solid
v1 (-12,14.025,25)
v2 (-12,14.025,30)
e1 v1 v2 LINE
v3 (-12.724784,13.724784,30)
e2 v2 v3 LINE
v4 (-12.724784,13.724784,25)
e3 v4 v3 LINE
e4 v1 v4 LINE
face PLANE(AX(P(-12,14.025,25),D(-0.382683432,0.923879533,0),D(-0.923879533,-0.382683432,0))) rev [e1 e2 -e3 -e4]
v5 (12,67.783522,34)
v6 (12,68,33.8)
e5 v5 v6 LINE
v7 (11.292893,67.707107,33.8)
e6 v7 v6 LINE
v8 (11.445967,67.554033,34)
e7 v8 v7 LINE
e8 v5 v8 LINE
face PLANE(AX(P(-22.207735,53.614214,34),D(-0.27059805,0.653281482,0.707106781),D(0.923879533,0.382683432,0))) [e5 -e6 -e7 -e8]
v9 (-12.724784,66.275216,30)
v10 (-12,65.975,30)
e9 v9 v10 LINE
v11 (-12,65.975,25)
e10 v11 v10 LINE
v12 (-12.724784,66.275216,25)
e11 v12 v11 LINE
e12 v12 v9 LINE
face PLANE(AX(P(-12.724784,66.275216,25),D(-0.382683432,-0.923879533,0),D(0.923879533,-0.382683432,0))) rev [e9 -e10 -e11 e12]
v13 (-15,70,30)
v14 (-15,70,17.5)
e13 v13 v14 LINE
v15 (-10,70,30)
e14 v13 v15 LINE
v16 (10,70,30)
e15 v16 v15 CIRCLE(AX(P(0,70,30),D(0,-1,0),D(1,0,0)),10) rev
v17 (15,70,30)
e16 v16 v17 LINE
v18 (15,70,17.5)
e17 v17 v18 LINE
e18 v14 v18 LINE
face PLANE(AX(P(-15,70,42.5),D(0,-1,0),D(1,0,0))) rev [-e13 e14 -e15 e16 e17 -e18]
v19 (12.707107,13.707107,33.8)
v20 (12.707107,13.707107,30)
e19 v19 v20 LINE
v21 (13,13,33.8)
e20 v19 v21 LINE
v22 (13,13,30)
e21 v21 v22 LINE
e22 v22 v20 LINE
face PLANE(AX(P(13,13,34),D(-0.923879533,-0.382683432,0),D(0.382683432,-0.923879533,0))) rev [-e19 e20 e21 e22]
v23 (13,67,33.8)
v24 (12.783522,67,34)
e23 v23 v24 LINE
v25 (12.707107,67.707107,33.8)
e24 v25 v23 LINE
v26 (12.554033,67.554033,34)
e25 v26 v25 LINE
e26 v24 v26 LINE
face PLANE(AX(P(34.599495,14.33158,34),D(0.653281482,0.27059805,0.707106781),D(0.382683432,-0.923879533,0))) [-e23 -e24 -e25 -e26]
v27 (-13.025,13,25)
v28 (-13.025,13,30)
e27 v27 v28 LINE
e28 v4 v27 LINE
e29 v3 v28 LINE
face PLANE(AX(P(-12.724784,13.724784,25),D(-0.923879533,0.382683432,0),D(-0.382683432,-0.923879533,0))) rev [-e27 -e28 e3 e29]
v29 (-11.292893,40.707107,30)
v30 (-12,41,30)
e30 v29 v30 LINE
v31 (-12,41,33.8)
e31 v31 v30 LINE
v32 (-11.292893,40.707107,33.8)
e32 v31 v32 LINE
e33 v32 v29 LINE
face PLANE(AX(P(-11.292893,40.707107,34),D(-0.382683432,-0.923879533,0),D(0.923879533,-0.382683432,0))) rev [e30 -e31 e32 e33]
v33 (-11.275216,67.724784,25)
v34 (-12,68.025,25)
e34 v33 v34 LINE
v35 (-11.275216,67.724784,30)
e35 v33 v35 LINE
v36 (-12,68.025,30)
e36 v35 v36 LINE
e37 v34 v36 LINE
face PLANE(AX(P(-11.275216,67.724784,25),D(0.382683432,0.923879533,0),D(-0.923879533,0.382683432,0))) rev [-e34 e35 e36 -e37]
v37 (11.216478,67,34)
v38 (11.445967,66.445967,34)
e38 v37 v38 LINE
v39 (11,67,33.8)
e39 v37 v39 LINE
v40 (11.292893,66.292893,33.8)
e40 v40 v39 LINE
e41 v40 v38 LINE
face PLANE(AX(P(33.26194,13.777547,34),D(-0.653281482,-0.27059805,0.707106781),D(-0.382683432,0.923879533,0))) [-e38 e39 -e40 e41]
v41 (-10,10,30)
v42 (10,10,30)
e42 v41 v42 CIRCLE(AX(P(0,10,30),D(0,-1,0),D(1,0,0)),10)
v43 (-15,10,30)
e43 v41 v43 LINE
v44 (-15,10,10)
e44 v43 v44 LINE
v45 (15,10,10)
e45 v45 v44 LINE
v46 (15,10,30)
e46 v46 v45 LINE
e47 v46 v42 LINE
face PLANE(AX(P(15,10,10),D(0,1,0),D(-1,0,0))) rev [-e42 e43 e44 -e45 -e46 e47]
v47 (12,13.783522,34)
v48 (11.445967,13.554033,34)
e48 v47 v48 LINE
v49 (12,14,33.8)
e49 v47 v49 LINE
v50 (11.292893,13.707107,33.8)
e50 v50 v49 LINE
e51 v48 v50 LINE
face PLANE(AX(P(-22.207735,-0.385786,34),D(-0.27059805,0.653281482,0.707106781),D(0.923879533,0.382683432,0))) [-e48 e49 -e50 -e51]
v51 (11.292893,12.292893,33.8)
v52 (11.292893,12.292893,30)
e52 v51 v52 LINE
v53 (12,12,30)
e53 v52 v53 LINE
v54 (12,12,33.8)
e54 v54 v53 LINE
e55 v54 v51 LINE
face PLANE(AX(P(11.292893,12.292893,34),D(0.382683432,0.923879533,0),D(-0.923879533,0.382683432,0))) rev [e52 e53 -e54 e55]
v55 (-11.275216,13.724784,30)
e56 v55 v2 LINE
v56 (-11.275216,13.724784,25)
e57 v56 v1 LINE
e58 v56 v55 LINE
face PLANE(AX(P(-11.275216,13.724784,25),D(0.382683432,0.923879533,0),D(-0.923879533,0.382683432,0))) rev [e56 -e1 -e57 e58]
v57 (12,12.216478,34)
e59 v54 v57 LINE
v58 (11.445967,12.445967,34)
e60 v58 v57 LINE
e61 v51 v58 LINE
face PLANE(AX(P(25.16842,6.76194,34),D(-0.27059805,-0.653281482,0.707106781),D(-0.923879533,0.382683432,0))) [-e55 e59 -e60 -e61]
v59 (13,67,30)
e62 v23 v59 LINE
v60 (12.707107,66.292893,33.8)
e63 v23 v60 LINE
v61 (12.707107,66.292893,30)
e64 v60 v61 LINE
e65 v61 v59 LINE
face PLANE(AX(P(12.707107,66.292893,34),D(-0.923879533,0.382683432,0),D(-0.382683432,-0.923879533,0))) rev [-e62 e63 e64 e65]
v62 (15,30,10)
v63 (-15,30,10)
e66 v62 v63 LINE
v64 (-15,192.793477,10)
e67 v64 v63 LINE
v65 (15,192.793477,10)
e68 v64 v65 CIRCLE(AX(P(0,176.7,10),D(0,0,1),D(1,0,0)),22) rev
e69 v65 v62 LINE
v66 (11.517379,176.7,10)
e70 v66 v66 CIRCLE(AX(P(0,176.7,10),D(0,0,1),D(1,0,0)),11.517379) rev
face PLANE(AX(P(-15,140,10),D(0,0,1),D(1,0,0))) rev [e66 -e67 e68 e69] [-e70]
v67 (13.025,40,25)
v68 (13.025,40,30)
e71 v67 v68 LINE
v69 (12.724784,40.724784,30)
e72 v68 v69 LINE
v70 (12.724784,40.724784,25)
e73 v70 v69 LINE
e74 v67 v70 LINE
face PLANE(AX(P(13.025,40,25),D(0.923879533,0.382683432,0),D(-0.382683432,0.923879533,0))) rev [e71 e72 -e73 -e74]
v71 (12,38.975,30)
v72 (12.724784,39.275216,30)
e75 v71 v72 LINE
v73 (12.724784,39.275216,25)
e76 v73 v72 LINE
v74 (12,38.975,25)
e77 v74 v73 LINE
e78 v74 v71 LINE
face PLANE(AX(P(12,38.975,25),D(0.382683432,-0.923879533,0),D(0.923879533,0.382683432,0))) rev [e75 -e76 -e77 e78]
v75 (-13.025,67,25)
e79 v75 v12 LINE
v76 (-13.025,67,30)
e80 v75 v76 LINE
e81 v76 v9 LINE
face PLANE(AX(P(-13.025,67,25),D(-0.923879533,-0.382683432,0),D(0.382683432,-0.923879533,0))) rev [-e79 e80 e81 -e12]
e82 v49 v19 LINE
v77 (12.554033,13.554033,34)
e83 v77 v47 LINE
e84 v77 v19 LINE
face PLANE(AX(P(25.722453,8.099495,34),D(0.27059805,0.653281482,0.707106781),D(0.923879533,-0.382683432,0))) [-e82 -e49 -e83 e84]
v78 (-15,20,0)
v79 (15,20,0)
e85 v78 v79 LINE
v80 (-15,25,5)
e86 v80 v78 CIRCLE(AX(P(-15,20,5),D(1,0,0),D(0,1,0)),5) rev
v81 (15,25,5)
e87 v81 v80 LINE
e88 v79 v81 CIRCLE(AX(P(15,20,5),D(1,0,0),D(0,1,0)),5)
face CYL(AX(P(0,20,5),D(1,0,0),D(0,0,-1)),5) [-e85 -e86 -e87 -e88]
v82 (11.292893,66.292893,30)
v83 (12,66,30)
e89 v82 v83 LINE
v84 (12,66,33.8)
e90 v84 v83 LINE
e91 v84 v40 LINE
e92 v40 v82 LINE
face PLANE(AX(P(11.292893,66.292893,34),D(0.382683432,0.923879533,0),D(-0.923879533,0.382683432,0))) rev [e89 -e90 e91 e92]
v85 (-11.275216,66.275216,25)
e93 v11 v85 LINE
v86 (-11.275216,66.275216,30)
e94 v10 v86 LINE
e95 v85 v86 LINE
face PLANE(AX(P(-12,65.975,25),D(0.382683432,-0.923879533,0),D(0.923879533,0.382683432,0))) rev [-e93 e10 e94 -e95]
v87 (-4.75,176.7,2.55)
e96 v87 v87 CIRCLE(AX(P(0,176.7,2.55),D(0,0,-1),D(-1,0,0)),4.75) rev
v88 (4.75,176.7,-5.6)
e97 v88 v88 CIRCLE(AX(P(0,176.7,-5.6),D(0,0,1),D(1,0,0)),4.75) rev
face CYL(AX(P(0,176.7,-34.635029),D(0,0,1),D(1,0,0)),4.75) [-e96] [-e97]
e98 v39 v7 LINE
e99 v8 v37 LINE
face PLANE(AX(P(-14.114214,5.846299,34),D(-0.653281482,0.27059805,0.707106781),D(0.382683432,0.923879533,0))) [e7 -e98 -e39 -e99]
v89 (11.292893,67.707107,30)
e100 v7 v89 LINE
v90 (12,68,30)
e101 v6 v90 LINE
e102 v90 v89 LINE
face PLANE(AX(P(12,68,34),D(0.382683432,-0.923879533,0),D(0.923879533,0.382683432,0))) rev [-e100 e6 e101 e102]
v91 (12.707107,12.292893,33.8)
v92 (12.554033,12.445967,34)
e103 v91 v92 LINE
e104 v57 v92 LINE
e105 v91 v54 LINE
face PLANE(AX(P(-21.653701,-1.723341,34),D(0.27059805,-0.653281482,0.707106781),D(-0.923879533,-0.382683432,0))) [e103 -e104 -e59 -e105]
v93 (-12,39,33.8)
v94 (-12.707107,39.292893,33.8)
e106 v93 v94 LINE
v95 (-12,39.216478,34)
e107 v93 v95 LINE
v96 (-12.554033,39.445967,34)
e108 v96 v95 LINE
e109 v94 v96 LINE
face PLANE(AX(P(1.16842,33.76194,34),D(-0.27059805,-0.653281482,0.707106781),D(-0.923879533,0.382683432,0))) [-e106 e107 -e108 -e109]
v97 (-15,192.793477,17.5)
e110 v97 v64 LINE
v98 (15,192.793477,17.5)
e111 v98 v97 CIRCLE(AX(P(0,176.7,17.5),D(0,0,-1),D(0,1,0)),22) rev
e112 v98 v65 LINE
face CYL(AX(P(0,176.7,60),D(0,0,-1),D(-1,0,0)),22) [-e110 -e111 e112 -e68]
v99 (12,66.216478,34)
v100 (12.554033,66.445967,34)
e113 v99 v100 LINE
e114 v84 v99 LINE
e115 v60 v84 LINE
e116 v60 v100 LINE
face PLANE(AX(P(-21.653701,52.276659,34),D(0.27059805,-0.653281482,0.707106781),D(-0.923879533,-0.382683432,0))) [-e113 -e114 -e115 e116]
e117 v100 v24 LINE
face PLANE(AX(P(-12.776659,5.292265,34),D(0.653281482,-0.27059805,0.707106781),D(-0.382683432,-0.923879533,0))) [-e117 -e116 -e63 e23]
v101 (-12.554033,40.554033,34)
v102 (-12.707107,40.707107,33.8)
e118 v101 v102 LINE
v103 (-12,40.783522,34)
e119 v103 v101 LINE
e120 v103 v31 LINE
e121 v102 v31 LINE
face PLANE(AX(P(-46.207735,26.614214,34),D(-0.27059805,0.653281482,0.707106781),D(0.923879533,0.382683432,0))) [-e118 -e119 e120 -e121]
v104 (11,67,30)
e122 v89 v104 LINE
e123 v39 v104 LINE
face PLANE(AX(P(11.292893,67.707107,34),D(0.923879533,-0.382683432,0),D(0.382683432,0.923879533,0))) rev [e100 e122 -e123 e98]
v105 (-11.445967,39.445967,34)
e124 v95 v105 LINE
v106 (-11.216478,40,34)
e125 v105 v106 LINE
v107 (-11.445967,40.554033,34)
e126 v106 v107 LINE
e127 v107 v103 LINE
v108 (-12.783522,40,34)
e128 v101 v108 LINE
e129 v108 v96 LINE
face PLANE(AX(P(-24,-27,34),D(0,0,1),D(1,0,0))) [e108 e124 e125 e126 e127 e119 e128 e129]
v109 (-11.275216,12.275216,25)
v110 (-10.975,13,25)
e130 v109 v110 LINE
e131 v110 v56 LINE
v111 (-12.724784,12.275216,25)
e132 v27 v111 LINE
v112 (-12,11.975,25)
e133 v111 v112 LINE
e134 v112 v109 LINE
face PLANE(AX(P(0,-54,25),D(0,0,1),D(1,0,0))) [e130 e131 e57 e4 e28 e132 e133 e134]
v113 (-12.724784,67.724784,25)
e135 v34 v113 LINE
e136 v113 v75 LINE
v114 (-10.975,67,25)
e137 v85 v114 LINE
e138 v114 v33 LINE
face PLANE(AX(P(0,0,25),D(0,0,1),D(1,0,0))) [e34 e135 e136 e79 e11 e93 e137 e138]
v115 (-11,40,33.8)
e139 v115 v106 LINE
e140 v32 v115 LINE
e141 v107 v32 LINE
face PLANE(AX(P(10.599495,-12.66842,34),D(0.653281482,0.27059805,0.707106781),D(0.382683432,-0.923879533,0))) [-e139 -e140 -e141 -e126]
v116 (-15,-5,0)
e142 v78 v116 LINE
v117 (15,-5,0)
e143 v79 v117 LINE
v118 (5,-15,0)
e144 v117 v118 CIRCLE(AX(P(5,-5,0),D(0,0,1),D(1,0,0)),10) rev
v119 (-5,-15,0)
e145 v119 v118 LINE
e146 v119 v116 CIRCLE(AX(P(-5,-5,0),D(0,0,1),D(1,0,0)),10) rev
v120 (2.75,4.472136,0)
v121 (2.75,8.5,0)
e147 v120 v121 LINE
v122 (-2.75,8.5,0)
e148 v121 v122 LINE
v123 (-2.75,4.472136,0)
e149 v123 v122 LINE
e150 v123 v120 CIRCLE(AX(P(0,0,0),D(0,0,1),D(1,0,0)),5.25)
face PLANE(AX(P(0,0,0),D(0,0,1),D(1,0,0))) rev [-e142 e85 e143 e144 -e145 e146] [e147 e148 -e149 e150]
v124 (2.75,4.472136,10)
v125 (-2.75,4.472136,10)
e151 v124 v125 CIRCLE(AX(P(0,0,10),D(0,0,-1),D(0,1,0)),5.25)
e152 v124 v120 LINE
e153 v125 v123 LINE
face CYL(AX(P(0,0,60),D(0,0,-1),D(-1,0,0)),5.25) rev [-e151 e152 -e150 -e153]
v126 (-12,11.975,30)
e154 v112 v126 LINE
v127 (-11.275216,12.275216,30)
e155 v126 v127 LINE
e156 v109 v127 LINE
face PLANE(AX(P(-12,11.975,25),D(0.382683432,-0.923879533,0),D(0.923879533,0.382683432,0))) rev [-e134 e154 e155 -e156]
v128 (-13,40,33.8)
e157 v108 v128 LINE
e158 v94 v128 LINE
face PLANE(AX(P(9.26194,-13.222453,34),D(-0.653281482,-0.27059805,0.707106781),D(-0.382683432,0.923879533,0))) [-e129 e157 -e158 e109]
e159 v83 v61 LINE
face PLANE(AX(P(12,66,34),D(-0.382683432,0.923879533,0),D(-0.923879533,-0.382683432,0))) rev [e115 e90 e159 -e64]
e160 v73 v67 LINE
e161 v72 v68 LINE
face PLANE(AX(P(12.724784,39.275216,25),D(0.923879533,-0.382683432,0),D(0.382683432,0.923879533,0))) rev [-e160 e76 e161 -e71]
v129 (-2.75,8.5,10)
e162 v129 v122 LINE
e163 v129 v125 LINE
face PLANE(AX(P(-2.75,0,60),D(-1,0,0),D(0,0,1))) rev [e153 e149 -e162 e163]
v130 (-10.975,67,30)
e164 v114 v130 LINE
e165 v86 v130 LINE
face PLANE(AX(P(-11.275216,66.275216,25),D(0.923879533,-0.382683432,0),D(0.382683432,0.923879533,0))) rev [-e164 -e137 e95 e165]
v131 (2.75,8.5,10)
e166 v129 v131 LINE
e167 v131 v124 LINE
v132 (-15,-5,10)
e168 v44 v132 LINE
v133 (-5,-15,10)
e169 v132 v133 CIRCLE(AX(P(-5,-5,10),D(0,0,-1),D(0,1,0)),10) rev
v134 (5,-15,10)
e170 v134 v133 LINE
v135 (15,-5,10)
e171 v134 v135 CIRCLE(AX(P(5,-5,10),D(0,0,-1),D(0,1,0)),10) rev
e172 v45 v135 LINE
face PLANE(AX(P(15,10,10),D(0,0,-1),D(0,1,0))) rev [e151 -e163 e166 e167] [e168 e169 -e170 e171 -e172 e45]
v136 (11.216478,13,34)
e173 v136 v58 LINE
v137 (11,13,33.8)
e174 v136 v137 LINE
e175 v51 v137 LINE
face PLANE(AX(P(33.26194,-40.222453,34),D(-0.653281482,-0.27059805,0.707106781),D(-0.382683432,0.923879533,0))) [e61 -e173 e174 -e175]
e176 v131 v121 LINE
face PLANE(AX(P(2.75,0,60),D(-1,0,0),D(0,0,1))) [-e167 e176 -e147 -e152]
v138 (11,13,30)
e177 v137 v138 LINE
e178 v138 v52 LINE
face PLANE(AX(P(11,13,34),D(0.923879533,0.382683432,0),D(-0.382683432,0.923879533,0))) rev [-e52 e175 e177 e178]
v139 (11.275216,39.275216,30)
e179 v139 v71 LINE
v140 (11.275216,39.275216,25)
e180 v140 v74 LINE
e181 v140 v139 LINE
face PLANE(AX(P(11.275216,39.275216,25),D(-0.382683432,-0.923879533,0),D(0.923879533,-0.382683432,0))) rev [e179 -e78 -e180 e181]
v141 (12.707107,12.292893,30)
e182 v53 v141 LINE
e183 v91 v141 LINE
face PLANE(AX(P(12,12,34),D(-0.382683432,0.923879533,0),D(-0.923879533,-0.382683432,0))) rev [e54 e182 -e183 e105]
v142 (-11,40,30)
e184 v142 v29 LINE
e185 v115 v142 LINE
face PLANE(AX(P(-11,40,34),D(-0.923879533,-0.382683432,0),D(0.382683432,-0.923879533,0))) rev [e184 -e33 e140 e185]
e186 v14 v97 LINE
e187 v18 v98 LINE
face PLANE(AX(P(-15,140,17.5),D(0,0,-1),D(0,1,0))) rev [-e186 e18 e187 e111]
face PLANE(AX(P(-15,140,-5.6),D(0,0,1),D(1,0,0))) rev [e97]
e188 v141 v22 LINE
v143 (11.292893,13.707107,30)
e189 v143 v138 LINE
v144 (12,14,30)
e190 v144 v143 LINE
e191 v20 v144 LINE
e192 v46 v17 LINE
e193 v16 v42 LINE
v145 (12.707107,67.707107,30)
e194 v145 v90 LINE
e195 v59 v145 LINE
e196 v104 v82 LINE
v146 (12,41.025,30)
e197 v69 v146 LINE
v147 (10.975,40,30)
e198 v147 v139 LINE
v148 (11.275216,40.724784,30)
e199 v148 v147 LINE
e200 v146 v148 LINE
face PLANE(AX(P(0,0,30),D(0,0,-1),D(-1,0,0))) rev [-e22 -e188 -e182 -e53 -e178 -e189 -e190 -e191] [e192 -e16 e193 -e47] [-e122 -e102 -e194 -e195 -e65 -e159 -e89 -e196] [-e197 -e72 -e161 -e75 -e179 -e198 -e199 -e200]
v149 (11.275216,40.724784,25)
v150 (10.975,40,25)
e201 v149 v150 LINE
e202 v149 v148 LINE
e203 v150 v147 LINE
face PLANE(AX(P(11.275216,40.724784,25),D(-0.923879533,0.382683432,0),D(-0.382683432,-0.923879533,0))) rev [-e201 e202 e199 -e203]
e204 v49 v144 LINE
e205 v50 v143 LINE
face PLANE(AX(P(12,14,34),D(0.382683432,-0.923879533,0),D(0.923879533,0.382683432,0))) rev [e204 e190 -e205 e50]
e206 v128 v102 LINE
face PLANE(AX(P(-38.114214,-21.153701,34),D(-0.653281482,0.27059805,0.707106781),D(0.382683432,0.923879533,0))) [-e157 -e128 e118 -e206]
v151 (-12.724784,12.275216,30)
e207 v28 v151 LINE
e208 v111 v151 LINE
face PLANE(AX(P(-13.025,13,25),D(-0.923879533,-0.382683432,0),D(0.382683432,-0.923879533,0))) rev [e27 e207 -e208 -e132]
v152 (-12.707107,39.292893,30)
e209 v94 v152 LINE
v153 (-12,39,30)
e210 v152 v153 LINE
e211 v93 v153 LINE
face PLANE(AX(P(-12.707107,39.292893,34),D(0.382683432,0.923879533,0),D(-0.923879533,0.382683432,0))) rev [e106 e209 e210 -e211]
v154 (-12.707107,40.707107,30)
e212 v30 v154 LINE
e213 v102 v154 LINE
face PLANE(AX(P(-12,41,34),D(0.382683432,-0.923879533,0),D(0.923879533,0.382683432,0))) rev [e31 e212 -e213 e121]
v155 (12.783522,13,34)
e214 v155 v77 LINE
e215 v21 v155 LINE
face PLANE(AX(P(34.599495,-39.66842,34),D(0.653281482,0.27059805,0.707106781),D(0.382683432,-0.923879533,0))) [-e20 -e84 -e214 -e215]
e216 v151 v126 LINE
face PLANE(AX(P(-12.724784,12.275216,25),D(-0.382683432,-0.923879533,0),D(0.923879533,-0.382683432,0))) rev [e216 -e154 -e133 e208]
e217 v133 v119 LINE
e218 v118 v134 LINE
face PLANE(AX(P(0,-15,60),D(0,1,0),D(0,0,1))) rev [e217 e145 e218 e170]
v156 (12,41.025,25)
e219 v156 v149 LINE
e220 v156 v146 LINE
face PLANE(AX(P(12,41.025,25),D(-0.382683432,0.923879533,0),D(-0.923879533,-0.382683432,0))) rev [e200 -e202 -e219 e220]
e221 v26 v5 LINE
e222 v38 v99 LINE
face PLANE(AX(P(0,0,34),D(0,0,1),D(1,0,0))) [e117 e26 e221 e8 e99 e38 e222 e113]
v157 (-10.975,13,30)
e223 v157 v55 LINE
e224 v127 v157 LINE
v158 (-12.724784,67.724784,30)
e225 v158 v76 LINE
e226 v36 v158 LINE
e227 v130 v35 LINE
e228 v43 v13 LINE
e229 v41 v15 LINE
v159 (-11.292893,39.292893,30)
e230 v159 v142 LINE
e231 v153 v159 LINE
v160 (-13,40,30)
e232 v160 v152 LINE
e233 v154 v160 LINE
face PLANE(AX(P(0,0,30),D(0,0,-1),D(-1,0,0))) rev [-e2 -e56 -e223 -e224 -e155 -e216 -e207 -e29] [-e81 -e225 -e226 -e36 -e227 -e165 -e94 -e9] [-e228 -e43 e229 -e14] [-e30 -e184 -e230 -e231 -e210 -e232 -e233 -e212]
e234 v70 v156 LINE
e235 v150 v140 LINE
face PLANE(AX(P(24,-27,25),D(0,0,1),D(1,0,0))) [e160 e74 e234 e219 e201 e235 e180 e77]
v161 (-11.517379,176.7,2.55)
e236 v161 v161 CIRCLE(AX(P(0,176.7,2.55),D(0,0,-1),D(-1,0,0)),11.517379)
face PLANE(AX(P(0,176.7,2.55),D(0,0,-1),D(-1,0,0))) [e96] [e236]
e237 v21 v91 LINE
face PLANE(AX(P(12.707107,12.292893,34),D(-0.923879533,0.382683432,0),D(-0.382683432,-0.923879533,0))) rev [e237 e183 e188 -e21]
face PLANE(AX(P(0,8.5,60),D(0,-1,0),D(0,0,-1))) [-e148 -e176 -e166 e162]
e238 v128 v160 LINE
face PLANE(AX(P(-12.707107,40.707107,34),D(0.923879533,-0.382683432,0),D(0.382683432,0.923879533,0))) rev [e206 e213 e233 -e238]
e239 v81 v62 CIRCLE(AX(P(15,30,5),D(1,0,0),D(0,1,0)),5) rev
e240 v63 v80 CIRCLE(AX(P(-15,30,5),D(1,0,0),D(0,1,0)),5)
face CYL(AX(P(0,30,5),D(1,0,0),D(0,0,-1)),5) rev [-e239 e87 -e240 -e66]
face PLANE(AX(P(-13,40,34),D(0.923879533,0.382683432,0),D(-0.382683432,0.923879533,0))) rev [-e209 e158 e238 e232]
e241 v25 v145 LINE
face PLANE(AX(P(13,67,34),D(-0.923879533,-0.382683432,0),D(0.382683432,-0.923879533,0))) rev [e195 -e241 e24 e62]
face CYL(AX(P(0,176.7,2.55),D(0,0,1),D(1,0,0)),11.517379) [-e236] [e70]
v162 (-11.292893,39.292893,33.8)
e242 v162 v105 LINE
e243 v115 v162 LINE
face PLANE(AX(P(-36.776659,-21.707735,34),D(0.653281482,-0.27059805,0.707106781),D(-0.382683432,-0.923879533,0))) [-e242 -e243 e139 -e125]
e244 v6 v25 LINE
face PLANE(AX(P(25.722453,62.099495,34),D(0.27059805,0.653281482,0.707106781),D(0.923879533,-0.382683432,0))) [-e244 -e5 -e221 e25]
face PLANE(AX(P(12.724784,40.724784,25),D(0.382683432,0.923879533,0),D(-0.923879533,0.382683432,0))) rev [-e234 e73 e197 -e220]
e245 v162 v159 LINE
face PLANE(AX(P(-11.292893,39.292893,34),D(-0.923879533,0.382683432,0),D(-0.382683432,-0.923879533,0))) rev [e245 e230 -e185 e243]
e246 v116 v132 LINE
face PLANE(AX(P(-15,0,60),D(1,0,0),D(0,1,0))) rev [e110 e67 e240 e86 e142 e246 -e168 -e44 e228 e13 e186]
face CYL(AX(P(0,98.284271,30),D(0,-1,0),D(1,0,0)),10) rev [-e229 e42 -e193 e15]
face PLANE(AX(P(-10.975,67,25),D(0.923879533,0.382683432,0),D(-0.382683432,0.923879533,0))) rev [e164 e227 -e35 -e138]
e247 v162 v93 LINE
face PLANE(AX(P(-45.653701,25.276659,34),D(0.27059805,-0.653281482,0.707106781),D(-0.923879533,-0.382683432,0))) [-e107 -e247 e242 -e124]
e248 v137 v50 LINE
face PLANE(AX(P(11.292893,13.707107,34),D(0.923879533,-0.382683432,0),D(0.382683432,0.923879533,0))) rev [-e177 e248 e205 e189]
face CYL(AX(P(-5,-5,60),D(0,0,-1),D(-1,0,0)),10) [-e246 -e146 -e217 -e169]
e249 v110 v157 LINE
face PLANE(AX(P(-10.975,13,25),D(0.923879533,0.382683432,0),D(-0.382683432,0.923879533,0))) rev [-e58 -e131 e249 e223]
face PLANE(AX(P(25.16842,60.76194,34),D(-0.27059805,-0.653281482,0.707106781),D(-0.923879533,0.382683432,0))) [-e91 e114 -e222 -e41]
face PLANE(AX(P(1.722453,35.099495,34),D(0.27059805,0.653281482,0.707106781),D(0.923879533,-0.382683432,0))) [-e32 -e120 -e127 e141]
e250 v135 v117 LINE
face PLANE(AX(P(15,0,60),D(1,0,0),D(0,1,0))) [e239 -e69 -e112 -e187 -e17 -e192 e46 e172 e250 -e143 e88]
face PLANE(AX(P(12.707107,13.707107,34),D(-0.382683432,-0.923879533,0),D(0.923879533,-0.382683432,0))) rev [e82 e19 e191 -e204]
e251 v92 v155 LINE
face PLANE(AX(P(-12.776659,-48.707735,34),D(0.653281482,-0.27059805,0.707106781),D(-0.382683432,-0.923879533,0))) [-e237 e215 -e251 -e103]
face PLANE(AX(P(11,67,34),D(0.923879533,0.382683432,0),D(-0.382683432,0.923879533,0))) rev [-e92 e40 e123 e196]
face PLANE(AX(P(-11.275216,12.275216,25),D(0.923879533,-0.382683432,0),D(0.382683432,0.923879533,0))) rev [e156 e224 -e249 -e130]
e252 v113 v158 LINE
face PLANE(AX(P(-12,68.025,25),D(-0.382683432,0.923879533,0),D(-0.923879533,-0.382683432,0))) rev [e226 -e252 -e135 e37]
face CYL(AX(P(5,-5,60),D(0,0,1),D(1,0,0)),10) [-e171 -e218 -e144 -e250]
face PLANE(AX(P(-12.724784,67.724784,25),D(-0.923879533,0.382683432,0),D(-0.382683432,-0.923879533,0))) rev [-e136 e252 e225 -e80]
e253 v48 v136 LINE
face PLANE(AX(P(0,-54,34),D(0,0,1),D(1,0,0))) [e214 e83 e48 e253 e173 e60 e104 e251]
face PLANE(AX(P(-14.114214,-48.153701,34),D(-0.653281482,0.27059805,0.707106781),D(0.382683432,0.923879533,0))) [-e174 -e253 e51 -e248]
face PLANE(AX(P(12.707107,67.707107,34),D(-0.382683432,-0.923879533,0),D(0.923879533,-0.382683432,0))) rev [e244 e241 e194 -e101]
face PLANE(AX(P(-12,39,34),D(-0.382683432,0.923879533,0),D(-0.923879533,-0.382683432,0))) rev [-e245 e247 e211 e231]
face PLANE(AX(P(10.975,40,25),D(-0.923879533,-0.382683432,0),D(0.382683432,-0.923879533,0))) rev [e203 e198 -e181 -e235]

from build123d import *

# Parameters (mm, degrees)
SKETCH2_W                  = 30
SKETCH2_H                  = 30
BOSS_EXTRUDE1_DEPTH        = 60
FILLET1_R                  = 10
SKETCH3_W                  = 40
SKETCH3_H                  = 25
CUT_EXTRUDE1_DEPTH         = 69.738635424
SKETCH6_W                  = 30
SKETCH6_H                  = 40
BOSS_EXTRUDE2_DEPTH        = 125
SKETCH7_W                  = 30
SKETCH7_H                  = 10
BOSS_EXTRUDE3_DEPTH        = 10
FILLET2_START              = -16
FILLET2_DEPTH              = 32
FILLET2_START_2            = -15
FILLET2_2_DEPTH            = 30
SKETCH8_W                  = 25
SKETCH8_H                  = 70
CUT_EXTRUDE2_DEPTH         = 156.241746963
SKETCH12_W                 = 30
SKETCH12_H                 = 7.5
BOSS_EXTRUDE4_DEPTH        = 65
SKETCH13_W                 = 20
SKETCH13_H                 = 54
CUT_EXTRUDE6_DEPTH         = 6
SKETCH20_R                 = 4.75
AXIS_BASE_DEPTH            = 49.6
CUT_EXTRUDE8_DEPTH         = 212.541958013
CUT_EXTRUDE8_DEPTH_BACK    = 212.541958013
SKETCH19_R                 = 2.5
SKETCH19_W                 = 20
SKETCH19_H                 = 42
CUT_EXTRUDE7_DEPTH         = 26.5
MAKE_HALF_DEPTH            = 225.175347112
ONE_MALE_JACK_DEPTH        = 4
CHAMFER1_SIZE              = 0.2
LPATTERN1_COUNT            = 2
LPATTERN1_PITCH            = 24
LPATTERN1_COUNT_DIR2       = 3
LPATTERN1_PITCH_DIR2       = 27
CHAMFER1_OF_LPATTERN1_SIZE = 0.2
ONE_FEMALE_JACK_DEPTH      = 5
FEMALE_JACKS_COUNT         = 2
FEMALE_JACKS_PITCH         = 24
FEMALE_JACKS_COUNT_DIR2    = 3
FEMALE_JACKS_PITCH_DIR2    = 27
SKETCH26_R                 = 10
MAKE_LIGHER_DEPTH          = 60
SKETCH27_R                 = 11.517379081
BOSS_EXTRUDE5_DEPTH        = 7.45


with BuildPart() as part:
    # Sketch2 → Boss-Extrude1 (new body)
    with BuildSketch(Plane.XY):
        Rectangle(SKETCH2_W, SKETCH2_H)
        with BuildLine():
            ThreePointArc((5.25, 0), (-2.561737691, -4.582575695), (-2.75, 4.472135955))
            Line((-2.75, 4.472135955), (-2.75, 8.5))
            Line((-2.75, 8.5), (0, 8.5))
            Line((0, 8.5), (2.75, 8.5))
            Line((2.75, 8.5), (2.75, 4.472135955))
            ThreePointArc((2.75, 4.472135955), (4.582575695, 2.561737691), (5.25, 0))
        make_face(mode=Mode.SUBTRACT)
    extrude(amount=BOSS_EXTRUDE1_DEPTH)

    # Fillet1
    fillet1_edges = [part.edges().sort_by_distance(p)[0] for p in [
        (15, -15, 30),
        (-15, -15, 30),
    ]]
    fillet(fillet1_edges, radius=FILLET1_R)

    # Sketch3 → Cut-Extrude1 (cut, through all)
    with BuildSketch(Plane.ZY.offset(15)):
        with Locations((30, -2.5)):
            Rectangle(SKETCH3_W, SKETCH3_H)
    extrude(amount=-CUT_EXTRUDE1_DEPTH, mode=Mode.SUBTRACT)

    # Sketch6 → Boss-Extrude2 (add)
    with BuildSketch(Plane(origin=(0, 15, 0), x_dir=(1, 0, 0), z_dir=(0, 1, 0))):
        with Locations((0, -30)):
            Rectangle(SKETCH6_W, SKETCH6_H)
    extrude(amount=BOSS_EXTRUDE2_DEPTH)

    # Sketch7 → Boss-Extrude3 (add)
    with BuildSketch(Plane(origin=(0, 15, 0), x_dir=(1, 0, 0), z_dir=(0, 1, 0))):
        with Locations((0, -5)):
            Rectangle(SKETCH7_W, SKETCH7_H)
        with Locations((0, -55)):
            Rectangle(SKETCH7_W, SKETCH7_H)
    extrude(amount=BOSS_EXTRUDE3_DEPTH)

    # Fillet2: read off the stored shape, not the designer's step
    # Fillet2 outline → Fillet2 (cut)
    with BuildSketch(Plane.YZ.offset(FILLET2_START)):
        with BuildLine():
            ThreePointArc((25, 5), (23.535533906, 1.464466094), (20, 0))
            Line((20, 0), (25, 0))
            Line((25, 0), (25, 5))
        make_face()
        with BuildLine():
            Line((25, 60), (20, 60))
            ThreePointArc((20, 60), (23.535533906, 58.535533906), (25, 55))
            Line((25, 55), (25, 60))
        make_face()
    extrude(amount=FILLET2_DEPTH, mode=Mode.SUBTRACT)

    # Fillet2 2 outline → Fillet2 2 (add)
    with BuildSketch(Plane.YZ.offset(FILLET2_START_2)):
        with BuildLine():
            Line((25, 10), (25, 5))
            ThreePointArc((25, 5), (26.464466094, 8.535533906), (30, 10))
            Line((30, 10), (25, 10))
        make_face()
        with BuildLine():
            ThreePointArc((30, 50), (26.464466094, 51.464466094), (25, 55))
            Line((25, 55), (25, 50))
            Line((25, 50), (30, 50))
        make_face()
    extrude(amount=FILLET2_2_DEPTH)

    # Sketch8 → Cut-Extrude2 (cut, through all)
    with BuildSketch(Plane(origin=(15, 0, 0), x_dir=(0, 0, -1), z_dir=(1, 0, 0))):
        with Locations((-30, 105)):
            Rectangle(SKETCH8_W, SKETCH8_H)
    extrude(amount=-CUT_EXTRUDE2_DEPTH, mode=Mode.SUBTRACT)

    # Sketch12 → Boss-Extrude4 (add)
    with BuildSketch(Plane(origin=(0, 140, 0), x_dir=(1, 0, 0), z_dir=(0, 1, 0))):
        with Locations((0, -13.75)):
            Rectangle(SKETCH12_W, SKETCH12_H)
        with Locations((0, -46.25)):
            Rectangle(SKETCH12_W, SKETCH12_H)
    extrude(amount=BOSS_EXTRUDE4_DEPTH)

    # Sketch13 → Cut-Extrude6 (cut)
    with BuildSketch(Plane.XY.offset(50)):
        with Locations((0, 168)):
            Rectangle(SKETCH13_W, SKETCH13_H)
    extrude(amount=-CUT_EXTRUDE6_DEPTH, mode=Mode.SUBTRACT)

    # Sketch20 → Axis Base (add)
    with BuildSketch(Plane.XY.offset(44)):
        with Locations(Location((0, 176.7, 0), (0, 0, 90))):
            Circle(SKETCH20_R)
    extrude(amount=-AXIS_BASE_DEPTH)

    # Sketch23 → Cut-Extrude8 (cut, two sides: drawn at the far end of the back side and taken through both)
    with BuildSketch(Plane(origin=(0, 0, 10), x_dir=(-1, 0, 0), z_dir=(0, 0, -1)).offset(-CUT_EXTRUDE8_DEPTH_BACK)):
        with BuildLine():
            Line((-15, 192.793476939), (-15, 205))
            Line((-15, 205), (15, 205))
            Line((15, 205), (15, 192.793476939))
            ThreePointArc((15, 192.793476939), (0, 198.7), (-15, 192.793476939))
        make_face()
    extrude(amount=CUT_EXTRUDE8_DEPTH + CUT_EXTRUDE8_DEPTH_BACK, mode=Mode.SUBTRACT)

    # Sketch19 → Cut-Extrude7 (cut)
    with BuildSketch(Plane.XY.offset(44)):
        with Locations((-5.12, 192)):
            Circle(SKETCH19_R)
        with Locations(Location((5.12, 192, 0), (0, 0, 270))):
            Circle(SKETCH19_R)
        with Locations((5.12, 144)):
            Circle(SKETCH19_R)
        with Locations(Location((-5.12, 144, 0), (0, 0, 270))):
            Circle(SKETCH19_R)
        with Locations((0, 168)):
            Rectangle(SKETCH19_W, SKETCH19_H)
    extrude(amount=-CUT_EXTRUDE7_DEPTH, mode=Mode.SUBTRACT)

    # 3DSketch2 → Make Half (cut, through all)
    with BuildSketch(Plane(origin=(-16.97773478, -20.308334844, 30), x_dir=(0.14055892995616934, 0.9900723141314359, 0), z_dir=(0, 0, 1))):
        Polygon((0, 0), (4.55547701, -32.087976668), (230.577525736, 0), (226.022048726, 32.087976668), align=None)
    extrude(amount=MAKE_HALF_DEPTH, mode=Mode.SUBTRACT)

    # Sketch24 → One Male Jack (add)
    with BuildSketch(Plane.XY.offset(30)):
        Polygon((12, 68), (11.292893219, 67.707106781), (11, 67), (11.292893219, 66.292893219), (12, 66), (12.707106781, 66.292893219), (13, 67), (12.707106781, 67.707106781), align=None)
    one_male_jack = extrude(amount=ONE_MALE_JACK_DEPTH)

    # Chamfer1
    chamfer1_edges = [part.edges().sort_by_distance(p)[0] for p in [
        (12.353553391, 67.853553391, 34),
        (11.646446609, 67.853553391, 34),
        (11.146446609, 67.353553391, 34),
        (11.146446609, 66.646446609, 34),
        (11.646446609, 66.146446609, 34),
        (12.353553391, 66.146446609, 34),
        (12.853553391, 66.646446609, 34),
        (12.853553391, 67.353553391, 34),
    ]]
    chamfer(chamfer1_edges, length=CHAMFER1_SIZE)

    # LPattern1: One Male Jack 2 × 3, 3 skipped
    with Locations(*[(-i * LPATTERN1_PITCH, -j * LPATTERN1_PITCH_DIR2, 0) for i in range(LPATTERN1_COUNT) for j in range(LPATTERN1_COUNT_DIR2) if (i, j) not in ((0, 0), (0, 1), (1, 0), (1, 2))]):
        add(one_male_jack)

    # Chamfer1 of LPattern1
    chamfer1_of_lpattern1_edges = [part.edges().sort_by_distance(p)[0] for p in [
        (12.353553391, 13.853553391, 34),
        (11.646446609, 13.853553391, 34),
        (11.146446609, 13.353553391, 34),
        (11.146446609, 12.646446609, 34),
        (11.646446609, 12.146446609, 34),
        (12.353553391, 12.146446609, 34),
        (12.853553391, 12.646446609, 34),
        (12.853553391, 13.353553391, 34),
        (-11.646446609, 40.853553391, 34),
        (-12.353553391, 40.853553391, 34),
        (-12.853553391, 40.353553391, 34),
        (-12.853553391, 39.646446609, 34),
        (-12.353553391, 39.146446609, 34),
        (-11.646446609, 39.146446609, 34),
        (-11.146446609, 39.646446609, 34),
        (-11.146446609, 40.353553391, 34),
    ]]
    chamfer(chamfer1_of_lpattern1_edges, length=CHAMFER1_OF_LPATTERN1_SIZE)

    # Sketch25 → One Female Jack (cut)
    with BuildSketch(Plane.XY.offset(30)):
        Polygon((-12, 68.025), (-12.724784451, 67.724784451), (-13.025, 67), (-12.724784451, 66.275215549), (-12, 65.975), (-11.275215549, 66.275215549), (-10.975, 67), (-11.275215549, 67.724784451), align=None)
    one_female_jack = extrude(amount=-ONE_FEMALE_JACK_DEPTH, mode=Mode.SUBTRACT)

    # Female Jacks: One Female Jack 2 × 3, 3 skipped
    with Locations(*[(i * FEMALE_JACKS_PITCH, -j * FEMALE_JACKS_PITCH_DIR2, 0) for i in range(FEMALE_JACKS_COUNT) for j in range(FEMALE_JACKS_COUNT_DIR2) if (i, j) not in ((0, 0), (0, 1), (1, 0), (1, 2))]):
        add(one_female_jack, mode=Mode.SUBTRACT)

    # Sketch26 → Make Ligher (cut)
    with BuildSketch(Plane.XZ.offset(-10)):
        with Locations((0, 30)):
            Circle(SKETCH26_R)
    extrude(amount=-MAKE_LIGHER_DEPTH, mode=Mode.SUBTRACT)

    # Sketch27 → Boss-Extrude5 (add)
    with BuildSketch(Plane(origin=(0, 0, 10), x_dir=(-1, 0, 0), z_dir=(0, 0, -1))):
        with Locations(Location((0, 176.7, 0), (0, 0, 180))):
            Circle(SKETCH27_R)
    extrude(amount=BOSS_EXTRUDE5_DEPTH)


solid = part.part
